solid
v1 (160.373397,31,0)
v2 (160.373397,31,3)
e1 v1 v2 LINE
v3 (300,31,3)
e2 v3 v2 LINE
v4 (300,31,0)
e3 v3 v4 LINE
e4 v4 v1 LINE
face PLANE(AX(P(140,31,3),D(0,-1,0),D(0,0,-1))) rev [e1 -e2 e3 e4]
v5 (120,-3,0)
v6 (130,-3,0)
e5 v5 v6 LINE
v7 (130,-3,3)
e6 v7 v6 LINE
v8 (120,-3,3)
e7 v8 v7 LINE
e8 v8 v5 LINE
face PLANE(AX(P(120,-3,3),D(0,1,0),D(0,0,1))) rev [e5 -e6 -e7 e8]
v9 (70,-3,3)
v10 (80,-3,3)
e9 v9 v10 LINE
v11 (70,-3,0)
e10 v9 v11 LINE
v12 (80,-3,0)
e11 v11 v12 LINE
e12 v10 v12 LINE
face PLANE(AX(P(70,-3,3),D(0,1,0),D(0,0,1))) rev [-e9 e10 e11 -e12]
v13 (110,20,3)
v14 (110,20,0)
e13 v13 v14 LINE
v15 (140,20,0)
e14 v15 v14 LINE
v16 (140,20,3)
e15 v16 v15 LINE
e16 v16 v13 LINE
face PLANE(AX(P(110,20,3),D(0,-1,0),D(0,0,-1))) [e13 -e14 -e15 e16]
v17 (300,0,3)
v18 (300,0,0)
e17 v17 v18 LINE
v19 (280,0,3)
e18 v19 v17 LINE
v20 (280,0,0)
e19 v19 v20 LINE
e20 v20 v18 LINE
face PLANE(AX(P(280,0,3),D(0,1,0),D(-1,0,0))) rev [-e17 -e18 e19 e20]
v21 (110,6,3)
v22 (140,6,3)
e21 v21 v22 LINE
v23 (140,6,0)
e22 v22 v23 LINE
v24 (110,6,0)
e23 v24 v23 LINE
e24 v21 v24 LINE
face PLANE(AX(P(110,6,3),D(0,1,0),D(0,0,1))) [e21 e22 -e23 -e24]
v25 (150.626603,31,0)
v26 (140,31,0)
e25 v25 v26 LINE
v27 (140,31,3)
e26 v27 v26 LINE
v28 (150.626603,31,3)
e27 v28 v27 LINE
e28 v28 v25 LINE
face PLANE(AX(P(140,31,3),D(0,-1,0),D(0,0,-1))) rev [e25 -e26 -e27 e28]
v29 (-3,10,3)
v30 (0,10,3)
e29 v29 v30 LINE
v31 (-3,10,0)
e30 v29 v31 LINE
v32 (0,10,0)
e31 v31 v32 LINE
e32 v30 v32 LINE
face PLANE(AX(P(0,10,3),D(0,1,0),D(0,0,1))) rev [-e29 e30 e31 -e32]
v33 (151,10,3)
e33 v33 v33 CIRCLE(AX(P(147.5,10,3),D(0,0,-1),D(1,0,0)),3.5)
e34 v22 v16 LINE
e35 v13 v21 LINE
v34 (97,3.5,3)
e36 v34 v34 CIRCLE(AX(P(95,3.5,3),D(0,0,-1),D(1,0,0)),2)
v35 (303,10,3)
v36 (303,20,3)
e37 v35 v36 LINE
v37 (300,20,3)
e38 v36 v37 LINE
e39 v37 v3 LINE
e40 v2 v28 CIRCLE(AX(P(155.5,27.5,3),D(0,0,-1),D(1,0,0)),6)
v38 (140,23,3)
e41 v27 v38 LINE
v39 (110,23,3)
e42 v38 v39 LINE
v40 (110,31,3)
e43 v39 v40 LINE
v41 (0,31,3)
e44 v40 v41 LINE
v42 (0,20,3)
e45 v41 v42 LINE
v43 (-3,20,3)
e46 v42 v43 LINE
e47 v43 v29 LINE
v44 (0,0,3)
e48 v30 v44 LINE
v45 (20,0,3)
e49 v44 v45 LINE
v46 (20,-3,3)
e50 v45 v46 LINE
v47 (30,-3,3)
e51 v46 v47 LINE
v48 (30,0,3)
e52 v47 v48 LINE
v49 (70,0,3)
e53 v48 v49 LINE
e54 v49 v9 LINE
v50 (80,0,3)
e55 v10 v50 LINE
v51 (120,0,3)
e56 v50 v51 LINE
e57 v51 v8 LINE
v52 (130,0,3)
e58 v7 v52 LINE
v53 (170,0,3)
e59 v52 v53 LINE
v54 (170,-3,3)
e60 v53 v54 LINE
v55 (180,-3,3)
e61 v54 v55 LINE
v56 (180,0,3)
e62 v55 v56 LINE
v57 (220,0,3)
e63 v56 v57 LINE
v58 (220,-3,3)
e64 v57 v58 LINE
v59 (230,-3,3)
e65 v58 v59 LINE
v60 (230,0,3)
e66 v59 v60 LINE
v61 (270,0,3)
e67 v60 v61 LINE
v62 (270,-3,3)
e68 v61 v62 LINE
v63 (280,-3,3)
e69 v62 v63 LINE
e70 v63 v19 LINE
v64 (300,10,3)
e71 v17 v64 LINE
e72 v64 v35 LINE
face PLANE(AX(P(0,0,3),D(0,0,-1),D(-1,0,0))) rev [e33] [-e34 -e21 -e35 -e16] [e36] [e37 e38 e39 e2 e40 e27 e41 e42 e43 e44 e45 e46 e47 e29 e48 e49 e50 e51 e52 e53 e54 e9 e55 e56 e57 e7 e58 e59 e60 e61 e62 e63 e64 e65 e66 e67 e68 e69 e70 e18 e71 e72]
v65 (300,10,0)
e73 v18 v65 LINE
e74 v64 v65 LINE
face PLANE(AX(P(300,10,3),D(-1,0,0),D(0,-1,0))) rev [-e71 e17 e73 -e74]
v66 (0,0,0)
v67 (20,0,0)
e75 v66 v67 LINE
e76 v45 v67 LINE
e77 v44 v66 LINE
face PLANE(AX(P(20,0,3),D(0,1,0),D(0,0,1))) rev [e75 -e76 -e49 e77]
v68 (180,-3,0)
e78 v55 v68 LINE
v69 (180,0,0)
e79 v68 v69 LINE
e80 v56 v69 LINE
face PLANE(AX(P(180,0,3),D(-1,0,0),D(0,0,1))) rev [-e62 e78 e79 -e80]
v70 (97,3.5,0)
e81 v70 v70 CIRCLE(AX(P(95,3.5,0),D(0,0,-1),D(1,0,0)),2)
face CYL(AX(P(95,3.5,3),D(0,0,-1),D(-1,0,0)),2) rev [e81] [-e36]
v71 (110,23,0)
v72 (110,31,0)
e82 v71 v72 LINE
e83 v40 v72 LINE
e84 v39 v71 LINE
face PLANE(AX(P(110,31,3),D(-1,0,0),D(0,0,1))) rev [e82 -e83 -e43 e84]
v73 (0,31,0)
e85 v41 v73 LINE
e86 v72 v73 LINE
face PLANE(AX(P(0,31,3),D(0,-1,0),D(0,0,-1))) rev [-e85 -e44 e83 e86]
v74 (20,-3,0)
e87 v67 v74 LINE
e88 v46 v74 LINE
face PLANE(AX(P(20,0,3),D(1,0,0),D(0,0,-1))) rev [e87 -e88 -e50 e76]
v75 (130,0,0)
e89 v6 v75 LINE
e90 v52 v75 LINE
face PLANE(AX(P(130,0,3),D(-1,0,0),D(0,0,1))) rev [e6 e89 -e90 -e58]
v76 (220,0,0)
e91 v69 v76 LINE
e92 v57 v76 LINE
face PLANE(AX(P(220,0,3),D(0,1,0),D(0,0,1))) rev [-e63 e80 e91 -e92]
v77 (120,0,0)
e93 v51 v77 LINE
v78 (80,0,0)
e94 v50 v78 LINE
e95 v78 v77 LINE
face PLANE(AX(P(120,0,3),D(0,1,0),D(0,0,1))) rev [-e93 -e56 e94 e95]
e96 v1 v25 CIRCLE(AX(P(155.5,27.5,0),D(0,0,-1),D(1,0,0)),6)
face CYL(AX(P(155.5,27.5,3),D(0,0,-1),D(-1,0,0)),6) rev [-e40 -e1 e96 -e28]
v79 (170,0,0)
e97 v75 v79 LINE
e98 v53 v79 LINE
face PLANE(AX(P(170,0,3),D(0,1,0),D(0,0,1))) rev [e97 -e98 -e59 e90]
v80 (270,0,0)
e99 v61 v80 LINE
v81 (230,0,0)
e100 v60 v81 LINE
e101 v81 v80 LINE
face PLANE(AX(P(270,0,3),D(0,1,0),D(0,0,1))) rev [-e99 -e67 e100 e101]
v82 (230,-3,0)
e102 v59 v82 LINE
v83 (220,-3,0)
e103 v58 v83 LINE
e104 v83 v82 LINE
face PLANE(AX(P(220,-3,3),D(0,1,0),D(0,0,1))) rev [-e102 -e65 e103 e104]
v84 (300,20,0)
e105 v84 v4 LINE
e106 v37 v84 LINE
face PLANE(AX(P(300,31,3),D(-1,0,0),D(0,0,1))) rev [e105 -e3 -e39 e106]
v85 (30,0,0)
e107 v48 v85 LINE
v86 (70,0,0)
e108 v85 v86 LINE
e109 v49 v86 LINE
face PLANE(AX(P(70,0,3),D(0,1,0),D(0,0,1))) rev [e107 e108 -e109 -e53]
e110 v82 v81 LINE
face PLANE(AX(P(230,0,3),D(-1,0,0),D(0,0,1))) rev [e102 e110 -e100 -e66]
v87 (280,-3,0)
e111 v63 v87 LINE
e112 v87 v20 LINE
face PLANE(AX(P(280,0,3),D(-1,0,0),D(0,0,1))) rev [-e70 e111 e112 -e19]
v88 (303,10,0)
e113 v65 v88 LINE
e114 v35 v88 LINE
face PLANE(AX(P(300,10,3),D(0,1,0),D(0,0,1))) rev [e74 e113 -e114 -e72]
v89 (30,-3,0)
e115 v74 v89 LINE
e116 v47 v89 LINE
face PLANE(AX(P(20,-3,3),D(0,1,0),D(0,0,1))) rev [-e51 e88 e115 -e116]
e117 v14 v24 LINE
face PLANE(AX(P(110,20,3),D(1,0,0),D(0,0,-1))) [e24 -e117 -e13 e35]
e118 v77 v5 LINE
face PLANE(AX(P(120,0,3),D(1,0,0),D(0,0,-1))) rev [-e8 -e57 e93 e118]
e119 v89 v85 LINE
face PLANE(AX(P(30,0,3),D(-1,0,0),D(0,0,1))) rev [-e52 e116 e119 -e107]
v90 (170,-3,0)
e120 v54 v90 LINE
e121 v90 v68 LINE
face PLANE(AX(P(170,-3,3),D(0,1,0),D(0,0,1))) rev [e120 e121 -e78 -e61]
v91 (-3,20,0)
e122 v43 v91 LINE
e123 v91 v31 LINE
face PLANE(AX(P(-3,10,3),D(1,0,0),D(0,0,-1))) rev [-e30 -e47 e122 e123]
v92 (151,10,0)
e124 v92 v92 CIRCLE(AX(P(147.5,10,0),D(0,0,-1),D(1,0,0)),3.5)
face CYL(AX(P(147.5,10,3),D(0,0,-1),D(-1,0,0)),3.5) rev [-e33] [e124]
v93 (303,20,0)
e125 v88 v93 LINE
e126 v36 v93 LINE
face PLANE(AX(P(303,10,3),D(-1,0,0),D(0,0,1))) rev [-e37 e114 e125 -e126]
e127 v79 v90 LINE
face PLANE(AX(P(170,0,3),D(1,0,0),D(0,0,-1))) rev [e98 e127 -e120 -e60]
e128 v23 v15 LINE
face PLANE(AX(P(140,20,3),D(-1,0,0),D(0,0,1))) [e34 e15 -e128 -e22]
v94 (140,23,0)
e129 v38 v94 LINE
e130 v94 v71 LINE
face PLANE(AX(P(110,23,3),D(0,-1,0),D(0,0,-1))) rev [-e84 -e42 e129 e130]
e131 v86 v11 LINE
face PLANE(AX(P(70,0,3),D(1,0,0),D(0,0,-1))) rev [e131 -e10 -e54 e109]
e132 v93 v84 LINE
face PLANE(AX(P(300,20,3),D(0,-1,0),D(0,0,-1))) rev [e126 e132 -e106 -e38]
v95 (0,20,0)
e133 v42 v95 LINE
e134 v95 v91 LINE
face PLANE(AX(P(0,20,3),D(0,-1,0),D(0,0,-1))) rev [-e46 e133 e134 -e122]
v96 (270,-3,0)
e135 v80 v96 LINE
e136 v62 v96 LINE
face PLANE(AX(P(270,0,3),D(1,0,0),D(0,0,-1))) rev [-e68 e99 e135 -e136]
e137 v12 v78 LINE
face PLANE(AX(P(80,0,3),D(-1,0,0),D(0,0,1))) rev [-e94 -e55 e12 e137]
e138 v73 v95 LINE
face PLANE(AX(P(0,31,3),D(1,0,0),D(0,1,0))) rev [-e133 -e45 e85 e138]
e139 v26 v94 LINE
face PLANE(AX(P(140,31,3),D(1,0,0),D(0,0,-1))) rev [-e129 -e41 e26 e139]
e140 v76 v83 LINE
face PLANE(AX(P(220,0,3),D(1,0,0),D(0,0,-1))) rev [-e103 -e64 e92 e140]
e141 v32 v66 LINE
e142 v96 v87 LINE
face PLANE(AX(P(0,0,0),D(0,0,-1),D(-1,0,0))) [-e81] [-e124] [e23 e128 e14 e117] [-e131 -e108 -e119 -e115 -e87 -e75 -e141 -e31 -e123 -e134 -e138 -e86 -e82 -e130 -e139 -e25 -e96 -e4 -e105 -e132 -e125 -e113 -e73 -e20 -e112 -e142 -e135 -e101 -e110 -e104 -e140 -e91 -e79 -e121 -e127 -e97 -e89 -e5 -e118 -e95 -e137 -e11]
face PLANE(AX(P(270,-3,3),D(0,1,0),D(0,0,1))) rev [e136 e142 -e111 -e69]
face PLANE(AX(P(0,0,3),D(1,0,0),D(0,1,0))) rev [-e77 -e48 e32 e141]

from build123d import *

# Parameters (mm, degrees)
IMPORTED_BODY_4_1_OUTLINE_W = 30
IMPORTED_BODY_4_1_OUTLINE_H = 14
IMPORTED_BODY_4_1_DEPTH     = 3
SKETCH_1_R                  = 3.5
SKETCH_1_R_2                = 2
SKETCH_1_R_3                = 6
CUT_EXTRUDE_1_DEPTH         = 3


# Read off the part's stored shape, not the designer's step: 基体零件-零件4-1
with BuildPart() as part:
    # 基体零件-零件4-1 outline → 基体零件-零件4-1 (new body)
    with BuildSketch(Plane.XY):
        Polygon((110, 31), (0, 31), (0, 20), (-3, 20), (-3, 10), (0, 10), (0, 0), (20, 0), (20, -3), (30, -3), (30, 0), (70, 0), (70, -3), (80, -3), (80, 0), (120, 0), (120, -3), (130, -3), (130, 0), (170, 0), (170, -3), (180, -3), (180, 0), (220, 0), (220, -3), (230, -3), (230, 0), (270, 0), (270, -3), (280, -3), (280, 0), (300, 0), (300, 10), (303, 10), (303, 20), (300, 20), (300, 31), (140, 31), (140, 23), (110, 23), align=None)
        with Locations((125, 13)):
            Rectangle(IMPORTED_BODY_4_1_OUTLINE_W, IMPORTED_BODY_4_1_OUTLINE_H, mode=Mode.SUBTRACT)
    extrude(amount=IMPORTED_BODY_4_1_DEPTH)

    # 草图1 → 切除-拉伸1 (cut)
    with BuildSketch(Plane(origin=(0, 0, 0), x_dir=(-1, 0, 0), z_dir=(0, 0, -1))):
        with Locations(Location((-147.5, 10, 0), (0, 0, 180))):
            Circle(SKETCH_1_R)
        with Locations(Location((-95, 3.5, 0), (0, 0, 180))):
            Circle(SKETCH_1_R_2)
        with Locations((-155.5, 27.5)):
            Circle(SKETCH_1_R_3)
    extrude(amount=-CUT_EXTRUDE_1_DEPTH, mode=Mode.SUBTRACT)


solid = part.part
